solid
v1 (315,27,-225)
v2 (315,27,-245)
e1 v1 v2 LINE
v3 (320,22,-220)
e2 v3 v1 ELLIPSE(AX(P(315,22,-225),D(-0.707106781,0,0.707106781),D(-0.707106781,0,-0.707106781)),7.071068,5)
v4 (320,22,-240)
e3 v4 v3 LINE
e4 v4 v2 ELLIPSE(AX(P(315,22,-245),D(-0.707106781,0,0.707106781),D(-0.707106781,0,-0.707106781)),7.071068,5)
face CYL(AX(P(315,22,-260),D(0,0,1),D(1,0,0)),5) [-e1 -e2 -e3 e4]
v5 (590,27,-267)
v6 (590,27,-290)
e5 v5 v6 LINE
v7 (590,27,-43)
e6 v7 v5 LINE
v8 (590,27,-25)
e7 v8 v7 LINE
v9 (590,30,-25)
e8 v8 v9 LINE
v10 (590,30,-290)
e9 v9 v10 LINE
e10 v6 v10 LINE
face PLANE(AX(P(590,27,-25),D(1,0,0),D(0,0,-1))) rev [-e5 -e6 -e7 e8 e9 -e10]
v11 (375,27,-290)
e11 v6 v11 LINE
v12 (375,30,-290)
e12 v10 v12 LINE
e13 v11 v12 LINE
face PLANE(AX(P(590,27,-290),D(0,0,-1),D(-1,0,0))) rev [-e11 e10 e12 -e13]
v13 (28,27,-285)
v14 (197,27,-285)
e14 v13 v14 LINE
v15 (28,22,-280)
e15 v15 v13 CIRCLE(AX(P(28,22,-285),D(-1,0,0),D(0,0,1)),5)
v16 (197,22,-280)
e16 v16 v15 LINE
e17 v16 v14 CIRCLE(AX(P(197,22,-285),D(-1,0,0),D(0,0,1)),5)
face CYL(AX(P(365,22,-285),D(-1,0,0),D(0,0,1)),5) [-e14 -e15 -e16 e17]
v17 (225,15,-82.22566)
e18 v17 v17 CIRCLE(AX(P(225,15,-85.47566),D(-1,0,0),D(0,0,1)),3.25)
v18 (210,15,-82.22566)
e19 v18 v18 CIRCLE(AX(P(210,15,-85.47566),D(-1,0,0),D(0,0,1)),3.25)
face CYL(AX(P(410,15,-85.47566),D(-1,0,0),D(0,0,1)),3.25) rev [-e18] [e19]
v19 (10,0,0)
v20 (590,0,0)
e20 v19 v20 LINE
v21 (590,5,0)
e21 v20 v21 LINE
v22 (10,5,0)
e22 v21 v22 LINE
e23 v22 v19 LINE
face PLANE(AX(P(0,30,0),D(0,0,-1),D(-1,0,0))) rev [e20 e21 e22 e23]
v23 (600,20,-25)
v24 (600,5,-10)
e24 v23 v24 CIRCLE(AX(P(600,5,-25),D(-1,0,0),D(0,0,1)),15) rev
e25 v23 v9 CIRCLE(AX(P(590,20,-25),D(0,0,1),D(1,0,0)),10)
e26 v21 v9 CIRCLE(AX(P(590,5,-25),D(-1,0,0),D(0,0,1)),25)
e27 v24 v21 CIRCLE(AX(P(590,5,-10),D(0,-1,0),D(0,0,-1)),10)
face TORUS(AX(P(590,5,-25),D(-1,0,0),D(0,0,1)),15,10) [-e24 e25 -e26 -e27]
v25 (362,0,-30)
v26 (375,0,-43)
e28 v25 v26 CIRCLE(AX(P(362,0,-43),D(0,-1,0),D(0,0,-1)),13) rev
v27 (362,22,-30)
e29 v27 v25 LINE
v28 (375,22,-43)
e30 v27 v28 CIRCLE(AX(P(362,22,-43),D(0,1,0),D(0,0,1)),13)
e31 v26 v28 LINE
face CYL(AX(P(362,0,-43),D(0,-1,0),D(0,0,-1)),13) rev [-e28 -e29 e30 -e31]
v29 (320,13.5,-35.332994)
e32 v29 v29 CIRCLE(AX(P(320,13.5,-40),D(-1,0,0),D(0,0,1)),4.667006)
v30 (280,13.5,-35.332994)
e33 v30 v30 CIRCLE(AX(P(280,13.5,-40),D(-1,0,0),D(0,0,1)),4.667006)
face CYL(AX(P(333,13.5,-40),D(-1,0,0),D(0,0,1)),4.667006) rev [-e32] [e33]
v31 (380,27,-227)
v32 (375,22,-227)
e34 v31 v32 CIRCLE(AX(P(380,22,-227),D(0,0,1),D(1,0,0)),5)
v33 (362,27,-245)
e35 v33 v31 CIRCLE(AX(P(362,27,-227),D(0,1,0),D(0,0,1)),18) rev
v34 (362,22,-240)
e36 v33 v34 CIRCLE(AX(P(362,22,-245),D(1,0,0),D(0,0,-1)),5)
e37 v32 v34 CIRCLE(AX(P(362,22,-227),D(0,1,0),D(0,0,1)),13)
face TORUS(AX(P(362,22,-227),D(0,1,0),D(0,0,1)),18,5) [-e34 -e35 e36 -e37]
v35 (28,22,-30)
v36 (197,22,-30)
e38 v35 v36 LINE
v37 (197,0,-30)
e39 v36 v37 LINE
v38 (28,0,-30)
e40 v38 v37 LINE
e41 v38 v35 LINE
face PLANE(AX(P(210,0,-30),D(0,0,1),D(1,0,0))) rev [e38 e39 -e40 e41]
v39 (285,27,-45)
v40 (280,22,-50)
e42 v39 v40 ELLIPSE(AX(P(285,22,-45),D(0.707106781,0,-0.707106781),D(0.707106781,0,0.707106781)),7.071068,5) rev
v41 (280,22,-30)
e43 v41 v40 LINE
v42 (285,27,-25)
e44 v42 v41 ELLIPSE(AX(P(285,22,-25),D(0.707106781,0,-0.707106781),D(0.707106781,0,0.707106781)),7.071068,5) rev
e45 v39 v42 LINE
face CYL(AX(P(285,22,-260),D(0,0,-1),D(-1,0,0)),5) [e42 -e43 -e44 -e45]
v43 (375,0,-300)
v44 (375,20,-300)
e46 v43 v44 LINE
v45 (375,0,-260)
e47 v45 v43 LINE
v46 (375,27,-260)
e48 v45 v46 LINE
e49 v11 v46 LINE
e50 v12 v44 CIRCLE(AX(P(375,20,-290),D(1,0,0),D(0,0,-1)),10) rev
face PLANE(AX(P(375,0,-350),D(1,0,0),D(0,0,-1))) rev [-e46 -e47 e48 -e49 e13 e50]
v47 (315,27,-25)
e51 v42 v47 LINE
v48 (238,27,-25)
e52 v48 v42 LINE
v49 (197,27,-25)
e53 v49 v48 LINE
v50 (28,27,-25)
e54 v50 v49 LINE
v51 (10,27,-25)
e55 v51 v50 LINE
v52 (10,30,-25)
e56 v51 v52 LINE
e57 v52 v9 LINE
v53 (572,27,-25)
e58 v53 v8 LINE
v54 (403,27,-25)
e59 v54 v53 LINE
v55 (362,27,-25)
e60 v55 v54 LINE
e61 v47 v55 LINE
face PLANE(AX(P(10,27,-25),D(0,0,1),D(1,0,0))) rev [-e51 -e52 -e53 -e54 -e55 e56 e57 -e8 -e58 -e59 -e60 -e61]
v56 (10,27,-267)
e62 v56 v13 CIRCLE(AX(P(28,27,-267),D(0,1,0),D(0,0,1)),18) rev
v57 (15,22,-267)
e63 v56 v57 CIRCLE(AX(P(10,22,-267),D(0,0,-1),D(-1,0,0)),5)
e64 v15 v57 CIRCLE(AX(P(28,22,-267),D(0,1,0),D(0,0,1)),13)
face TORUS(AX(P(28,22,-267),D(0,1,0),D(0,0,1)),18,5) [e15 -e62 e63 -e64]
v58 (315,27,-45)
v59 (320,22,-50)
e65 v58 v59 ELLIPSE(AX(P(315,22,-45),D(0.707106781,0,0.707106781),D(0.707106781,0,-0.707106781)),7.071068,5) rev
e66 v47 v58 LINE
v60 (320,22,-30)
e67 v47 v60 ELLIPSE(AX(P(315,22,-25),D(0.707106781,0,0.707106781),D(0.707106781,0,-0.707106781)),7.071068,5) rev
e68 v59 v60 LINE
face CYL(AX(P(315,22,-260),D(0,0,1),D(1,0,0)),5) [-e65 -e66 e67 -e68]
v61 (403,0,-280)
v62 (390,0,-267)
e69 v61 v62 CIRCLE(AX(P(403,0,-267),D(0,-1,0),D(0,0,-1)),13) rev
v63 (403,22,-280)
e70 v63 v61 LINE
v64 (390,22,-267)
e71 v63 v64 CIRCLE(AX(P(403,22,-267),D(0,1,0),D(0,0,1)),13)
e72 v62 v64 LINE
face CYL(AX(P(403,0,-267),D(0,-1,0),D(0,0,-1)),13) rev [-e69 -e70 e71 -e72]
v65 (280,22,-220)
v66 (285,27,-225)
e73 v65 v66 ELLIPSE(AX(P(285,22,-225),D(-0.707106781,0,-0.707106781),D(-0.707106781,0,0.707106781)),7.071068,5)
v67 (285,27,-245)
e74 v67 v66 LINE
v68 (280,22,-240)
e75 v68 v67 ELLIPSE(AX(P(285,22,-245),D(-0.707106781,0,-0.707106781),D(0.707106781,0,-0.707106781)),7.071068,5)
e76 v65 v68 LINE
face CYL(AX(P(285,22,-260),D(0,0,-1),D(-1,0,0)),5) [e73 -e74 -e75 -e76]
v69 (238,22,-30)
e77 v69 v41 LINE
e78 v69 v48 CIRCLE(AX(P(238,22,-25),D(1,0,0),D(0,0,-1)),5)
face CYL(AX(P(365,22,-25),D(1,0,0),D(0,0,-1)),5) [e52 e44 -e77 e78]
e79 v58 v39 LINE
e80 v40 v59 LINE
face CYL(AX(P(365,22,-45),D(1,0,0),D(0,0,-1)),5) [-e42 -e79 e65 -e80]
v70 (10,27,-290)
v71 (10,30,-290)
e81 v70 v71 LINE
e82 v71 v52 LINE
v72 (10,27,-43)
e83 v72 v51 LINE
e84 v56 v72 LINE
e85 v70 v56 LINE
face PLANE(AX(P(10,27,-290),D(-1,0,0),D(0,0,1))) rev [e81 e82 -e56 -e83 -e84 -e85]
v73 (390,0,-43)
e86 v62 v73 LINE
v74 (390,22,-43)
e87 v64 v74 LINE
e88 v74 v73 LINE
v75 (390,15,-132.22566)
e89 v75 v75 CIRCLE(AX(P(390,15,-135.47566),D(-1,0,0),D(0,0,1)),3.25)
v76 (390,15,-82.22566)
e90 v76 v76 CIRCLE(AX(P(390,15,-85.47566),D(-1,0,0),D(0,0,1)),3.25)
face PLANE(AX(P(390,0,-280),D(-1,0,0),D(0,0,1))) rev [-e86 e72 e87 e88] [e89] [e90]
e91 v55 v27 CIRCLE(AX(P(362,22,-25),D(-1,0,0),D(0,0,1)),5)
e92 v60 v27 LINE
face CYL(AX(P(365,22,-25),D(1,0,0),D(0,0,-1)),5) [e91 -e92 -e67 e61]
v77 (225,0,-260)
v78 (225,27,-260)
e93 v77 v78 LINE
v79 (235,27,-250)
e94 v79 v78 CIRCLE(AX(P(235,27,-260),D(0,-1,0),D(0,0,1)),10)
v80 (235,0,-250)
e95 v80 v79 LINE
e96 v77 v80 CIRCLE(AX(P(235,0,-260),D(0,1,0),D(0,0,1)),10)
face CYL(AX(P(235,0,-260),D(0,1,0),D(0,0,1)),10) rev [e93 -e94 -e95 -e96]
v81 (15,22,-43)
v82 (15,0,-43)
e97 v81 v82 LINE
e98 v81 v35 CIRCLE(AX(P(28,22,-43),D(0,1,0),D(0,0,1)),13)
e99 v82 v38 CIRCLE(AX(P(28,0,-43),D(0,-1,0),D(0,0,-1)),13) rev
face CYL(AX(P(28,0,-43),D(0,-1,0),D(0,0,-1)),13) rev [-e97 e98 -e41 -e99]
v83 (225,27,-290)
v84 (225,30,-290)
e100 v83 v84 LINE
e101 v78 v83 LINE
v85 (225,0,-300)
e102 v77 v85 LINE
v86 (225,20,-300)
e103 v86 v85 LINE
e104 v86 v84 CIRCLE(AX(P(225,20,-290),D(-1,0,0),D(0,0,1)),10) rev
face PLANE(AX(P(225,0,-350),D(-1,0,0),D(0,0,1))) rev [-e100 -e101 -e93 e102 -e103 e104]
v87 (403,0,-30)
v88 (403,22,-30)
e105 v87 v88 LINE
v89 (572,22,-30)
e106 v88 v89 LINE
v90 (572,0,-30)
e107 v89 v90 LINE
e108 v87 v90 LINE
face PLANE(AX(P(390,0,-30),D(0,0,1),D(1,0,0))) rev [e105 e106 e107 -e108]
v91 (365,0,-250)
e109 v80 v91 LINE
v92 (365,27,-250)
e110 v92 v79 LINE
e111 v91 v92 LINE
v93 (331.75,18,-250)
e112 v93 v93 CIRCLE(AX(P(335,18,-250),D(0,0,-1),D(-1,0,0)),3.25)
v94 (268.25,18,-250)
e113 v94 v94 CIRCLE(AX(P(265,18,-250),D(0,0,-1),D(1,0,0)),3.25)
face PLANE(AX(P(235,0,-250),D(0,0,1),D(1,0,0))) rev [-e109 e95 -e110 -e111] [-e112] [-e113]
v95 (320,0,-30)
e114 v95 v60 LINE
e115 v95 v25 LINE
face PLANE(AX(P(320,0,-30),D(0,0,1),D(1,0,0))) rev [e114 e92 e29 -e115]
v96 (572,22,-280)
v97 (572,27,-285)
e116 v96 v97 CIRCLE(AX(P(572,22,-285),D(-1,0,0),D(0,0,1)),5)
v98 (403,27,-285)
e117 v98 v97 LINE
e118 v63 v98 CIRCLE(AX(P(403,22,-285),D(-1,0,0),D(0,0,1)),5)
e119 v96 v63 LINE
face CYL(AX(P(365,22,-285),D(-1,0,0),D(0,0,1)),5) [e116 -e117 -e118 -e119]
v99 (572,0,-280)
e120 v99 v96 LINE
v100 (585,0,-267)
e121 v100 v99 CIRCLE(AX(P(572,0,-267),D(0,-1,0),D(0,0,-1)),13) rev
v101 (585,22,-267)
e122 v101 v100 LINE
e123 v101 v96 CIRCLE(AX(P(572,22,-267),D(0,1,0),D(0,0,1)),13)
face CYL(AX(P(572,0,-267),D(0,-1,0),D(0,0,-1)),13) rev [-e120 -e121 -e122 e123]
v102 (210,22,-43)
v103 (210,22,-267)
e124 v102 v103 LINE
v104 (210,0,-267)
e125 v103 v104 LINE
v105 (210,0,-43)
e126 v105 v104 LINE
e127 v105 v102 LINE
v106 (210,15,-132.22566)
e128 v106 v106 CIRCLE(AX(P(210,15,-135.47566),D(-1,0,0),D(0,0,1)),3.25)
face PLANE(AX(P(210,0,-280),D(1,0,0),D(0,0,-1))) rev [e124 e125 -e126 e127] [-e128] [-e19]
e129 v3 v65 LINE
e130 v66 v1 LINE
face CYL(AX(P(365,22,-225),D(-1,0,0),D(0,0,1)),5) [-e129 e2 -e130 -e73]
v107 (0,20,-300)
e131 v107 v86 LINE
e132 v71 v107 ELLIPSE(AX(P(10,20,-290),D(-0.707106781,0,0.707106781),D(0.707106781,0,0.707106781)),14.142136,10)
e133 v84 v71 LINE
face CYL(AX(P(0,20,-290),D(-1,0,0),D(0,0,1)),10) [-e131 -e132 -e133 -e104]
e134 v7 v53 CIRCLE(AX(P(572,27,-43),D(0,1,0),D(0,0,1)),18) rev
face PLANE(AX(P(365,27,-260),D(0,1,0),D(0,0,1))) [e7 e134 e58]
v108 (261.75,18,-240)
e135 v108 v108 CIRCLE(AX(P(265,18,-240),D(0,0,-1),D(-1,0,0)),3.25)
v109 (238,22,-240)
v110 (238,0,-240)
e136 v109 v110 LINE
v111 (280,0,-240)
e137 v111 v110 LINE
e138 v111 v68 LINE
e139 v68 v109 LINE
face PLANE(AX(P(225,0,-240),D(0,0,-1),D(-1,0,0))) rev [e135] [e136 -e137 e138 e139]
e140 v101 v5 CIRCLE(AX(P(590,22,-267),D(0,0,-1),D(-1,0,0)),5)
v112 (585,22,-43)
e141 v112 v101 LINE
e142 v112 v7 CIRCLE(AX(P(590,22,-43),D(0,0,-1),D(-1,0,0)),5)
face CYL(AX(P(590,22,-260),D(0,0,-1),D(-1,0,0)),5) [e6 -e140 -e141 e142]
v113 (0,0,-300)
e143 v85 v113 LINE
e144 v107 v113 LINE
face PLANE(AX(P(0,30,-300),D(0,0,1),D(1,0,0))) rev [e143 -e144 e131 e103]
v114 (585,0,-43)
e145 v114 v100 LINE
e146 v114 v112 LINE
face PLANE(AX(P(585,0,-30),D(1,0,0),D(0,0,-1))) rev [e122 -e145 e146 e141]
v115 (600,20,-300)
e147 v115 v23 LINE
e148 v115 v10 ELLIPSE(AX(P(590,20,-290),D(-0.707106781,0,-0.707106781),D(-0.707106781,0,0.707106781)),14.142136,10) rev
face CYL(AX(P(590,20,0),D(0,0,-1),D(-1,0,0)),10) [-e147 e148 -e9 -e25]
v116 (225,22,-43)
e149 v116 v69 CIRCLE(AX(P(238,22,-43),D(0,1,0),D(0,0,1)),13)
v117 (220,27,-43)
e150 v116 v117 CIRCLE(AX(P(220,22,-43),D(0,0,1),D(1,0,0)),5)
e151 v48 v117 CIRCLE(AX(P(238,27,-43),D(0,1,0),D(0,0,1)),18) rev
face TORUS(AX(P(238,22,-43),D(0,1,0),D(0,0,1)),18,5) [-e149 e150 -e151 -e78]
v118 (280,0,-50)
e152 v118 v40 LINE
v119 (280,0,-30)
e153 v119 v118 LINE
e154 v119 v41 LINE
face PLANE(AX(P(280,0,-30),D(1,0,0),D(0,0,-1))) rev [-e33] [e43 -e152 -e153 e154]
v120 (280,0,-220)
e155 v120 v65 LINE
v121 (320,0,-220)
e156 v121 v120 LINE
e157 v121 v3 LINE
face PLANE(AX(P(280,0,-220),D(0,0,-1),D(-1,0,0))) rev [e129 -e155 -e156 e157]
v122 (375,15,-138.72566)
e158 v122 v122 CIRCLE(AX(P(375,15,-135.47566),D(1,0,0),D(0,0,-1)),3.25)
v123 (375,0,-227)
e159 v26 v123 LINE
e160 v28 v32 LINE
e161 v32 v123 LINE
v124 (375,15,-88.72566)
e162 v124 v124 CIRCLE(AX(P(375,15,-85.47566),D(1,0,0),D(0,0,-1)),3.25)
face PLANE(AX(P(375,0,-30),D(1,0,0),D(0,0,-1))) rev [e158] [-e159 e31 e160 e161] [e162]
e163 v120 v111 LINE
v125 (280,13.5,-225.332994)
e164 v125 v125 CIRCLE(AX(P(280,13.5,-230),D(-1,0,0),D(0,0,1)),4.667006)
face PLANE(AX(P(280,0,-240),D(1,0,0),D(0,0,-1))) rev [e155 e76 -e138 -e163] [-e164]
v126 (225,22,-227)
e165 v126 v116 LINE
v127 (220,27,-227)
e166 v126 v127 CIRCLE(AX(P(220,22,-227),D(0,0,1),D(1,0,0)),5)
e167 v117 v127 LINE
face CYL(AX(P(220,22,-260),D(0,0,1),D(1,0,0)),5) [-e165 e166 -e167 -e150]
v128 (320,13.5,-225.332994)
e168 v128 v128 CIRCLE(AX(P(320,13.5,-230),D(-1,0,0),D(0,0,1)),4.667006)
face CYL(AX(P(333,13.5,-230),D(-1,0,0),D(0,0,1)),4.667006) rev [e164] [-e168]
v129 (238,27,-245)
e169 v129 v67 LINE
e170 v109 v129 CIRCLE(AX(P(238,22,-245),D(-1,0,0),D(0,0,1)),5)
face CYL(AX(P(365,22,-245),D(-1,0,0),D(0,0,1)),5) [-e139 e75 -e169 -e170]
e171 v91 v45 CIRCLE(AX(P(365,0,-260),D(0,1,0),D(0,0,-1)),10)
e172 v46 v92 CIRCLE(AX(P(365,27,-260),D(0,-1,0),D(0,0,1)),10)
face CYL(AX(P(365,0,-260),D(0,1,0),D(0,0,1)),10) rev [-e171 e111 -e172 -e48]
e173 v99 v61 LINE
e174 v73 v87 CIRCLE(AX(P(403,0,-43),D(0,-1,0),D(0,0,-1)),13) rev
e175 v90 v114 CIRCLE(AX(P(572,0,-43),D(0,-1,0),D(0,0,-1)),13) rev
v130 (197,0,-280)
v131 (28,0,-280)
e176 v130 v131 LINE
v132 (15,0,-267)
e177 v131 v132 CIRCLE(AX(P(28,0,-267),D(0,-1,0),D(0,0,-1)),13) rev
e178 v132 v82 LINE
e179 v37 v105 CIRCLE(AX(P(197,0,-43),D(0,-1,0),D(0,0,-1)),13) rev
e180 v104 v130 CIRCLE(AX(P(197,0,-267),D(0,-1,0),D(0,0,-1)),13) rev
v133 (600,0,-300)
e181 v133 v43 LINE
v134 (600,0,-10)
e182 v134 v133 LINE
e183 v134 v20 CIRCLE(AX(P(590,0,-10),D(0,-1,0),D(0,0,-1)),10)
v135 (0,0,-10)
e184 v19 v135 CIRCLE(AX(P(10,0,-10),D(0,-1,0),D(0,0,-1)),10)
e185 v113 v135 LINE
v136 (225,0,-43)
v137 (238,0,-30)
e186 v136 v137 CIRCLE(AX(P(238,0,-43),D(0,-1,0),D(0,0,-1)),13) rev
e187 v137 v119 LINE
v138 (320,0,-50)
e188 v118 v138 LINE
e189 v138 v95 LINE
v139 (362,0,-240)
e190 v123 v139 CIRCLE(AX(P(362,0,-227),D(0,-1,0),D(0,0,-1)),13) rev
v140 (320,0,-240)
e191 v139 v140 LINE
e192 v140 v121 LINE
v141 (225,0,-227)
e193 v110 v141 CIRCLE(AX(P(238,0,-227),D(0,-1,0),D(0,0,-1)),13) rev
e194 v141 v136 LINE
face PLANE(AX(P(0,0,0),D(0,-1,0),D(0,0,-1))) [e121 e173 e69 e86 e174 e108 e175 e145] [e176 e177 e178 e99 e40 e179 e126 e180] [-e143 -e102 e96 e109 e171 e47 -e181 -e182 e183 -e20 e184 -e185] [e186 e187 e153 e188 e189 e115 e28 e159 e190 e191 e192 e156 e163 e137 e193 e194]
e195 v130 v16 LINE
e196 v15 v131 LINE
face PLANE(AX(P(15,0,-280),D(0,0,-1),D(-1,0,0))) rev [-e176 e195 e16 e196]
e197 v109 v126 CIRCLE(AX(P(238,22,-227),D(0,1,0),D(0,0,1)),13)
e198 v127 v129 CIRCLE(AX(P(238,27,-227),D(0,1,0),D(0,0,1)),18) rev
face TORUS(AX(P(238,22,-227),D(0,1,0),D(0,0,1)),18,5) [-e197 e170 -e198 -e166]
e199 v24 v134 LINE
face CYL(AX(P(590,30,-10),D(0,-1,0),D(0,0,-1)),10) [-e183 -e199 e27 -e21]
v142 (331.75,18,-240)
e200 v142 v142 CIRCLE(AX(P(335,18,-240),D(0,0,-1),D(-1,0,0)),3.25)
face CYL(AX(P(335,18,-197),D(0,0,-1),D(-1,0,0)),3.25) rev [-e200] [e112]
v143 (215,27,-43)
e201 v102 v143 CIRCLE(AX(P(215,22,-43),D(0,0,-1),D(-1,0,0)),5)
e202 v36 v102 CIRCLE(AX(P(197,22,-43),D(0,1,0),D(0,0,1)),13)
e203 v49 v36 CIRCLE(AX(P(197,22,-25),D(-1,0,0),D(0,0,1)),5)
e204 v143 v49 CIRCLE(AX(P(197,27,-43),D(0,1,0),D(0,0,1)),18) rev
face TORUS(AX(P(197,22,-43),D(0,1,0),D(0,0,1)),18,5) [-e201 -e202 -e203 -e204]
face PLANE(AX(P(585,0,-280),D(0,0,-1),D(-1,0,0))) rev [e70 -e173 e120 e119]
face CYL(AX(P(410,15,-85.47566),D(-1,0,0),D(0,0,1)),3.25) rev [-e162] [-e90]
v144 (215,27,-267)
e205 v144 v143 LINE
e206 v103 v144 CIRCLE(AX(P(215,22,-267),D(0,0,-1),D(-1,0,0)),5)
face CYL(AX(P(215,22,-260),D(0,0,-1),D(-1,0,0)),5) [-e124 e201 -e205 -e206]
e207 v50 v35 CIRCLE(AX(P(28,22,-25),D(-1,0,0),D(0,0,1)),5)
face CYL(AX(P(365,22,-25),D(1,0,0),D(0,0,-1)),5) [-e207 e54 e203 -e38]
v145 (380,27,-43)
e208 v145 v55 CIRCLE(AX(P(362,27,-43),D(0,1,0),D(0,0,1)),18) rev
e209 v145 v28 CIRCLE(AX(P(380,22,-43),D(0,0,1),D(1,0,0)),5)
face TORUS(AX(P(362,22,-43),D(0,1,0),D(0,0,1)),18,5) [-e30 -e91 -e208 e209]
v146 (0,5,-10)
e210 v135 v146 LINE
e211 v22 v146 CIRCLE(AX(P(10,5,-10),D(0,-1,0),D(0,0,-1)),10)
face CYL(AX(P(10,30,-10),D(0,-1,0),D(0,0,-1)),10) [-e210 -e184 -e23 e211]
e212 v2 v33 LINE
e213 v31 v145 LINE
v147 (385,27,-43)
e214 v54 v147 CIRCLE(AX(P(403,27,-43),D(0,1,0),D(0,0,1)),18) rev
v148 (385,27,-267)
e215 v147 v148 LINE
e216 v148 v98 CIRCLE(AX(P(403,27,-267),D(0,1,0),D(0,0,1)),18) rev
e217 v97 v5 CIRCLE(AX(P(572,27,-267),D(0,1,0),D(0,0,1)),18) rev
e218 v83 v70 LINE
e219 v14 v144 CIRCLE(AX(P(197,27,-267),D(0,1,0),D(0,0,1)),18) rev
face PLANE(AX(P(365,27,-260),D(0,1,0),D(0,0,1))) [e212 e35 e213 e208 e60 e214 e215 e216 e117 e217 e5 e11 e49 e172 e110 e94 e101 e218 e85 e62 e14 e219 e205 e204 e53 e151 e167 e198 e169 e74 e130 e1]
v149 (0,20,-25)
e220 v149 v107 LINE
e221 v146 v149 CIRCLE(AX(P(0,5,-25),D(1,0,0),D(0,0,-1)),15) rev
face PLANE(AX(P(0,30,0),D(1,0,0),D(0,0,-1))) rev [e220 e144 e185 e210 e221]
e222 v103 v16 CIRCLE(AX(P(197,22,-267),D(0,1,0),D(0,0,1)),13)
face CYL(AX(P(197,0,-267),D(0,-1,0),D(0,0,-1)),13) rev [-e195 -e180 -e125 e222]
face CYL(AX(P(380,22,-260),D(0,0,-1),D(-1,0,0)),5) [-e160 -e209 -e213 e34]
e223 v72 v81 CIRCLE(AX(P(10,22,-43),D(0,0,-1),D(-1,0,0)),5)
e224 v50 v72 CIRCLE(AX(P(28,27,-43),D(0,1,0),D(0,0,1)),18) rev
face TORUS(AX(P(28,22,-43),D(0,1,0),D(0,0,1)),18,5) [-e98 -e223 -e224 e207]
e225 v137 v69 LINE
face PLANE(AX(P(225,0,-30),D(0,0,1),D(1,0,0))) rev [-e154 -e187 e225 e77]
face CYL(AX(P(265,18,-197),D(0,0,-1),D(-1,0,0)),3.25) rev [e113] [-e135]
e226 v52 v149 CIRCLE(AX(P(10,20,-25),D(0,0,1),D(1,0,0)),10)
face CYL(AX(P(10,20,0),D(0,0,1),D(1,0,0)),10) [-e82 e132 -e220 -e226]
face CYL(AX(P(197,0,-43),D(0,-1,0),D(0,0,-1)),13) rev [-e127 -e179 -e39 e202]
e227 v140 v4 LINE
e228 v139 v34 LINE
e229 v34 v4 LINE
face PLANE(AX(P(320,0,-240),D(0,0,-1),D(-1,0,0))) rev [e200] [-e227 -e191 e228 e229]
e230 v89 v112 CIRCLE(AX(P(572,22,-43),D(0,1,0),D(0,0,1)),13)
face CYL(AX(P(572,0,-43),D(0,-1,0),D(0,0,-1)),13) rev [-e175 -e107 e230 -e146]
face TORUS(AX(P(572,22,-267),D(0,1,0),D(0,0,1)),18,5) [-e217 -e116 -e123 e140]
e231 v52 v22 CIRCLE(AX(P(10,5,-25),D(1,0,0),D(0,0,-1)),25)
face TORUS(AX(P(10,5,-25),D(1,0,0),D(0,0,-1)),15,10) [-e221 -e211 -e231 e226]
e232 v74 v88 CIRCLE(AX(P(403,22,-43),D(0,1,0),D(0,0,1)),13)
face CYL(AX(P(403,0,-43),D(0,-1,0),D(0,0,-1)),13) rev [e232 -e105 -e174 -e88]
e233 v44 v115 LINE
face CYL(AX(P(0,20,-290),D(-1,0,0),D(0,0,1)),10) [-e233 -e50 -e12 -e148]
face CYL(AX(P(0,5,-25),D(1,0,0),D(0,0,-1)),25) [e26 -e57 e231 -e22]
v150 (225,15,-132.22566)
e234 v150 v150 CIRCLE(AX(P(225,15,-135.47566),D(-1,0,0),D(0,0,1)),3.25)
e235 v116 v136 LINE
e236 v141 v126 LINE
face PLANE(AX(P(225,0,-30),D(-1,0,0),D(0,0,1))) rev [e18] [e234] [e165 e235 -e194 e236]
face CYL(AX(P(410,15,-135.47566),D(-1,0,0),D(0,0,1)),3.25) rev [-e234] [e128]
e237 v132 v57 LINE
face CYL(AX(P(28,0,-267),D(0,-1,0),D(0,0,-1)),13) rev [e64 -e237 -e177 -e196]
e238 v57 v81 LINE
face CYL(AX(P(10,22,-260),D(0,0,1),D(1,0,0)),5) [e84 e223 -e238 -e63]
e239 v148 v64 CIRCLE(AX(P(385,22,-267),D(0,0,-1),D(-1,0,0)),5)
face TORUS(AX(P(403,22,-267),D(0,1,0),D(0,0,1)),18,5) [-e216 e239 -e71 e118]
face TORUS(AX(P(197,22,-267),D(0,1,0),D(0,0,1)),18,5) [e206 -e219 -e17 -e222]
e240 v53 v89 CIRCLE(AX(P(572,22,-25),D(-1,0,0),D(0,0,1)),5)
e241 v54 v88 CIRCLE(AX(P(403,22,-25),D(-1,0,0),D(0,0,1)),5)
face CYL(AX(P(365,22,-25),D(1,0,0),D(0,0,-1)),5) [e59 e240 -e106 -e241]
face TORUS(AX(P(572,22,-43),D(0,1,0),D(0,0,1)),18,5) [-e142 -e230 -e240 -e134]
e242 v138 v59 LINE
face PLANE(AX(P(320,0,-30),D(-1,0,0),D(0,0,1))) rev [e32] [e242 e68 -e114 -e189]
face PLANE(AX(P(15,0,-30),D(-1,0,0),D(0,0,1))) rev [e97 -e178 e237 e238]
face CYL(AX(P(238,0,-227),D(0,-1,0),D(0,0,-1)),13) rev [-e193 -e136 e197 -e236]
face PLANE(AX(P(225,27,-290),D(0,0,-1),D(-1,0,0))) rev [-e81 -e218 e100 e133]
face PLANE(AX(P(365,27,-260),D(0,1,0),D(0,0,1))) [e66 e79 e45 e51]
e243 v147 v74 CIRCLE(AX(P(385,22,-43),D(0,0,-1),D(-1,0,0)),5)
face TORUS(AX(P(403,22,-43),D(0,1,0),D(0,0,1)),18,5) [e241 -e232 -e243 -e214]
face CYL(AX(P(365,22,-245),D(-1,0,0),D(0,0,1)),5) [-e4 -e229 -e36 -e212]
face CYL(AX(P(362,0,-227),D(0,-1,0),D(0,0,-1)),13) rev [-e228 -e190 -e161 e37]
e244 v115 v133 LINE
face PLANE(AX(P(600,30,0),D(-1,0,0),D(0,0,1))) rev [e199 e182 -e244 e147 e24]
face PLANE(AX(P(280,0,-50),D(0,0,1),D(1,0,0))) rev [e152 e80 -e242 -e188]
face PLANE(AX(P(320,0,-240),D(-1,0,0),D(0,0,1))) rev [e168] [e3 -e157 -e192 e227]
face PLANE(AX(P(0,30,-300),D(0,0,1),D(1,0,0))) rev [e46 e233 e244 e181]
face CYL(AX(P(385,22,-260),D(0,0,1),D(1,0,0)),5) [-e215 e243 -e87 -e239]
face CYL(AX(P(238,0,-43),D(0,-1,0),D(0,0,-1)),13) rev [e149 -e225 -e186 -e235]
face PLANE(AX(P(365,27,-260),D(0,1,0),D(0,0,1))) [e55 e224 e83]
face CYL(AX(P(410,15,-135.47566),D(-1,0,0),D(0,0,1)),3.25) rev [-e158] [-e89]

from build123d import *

# Parameters (mm, degrees)
SKETCH1_W           = 600
SKETCH1_H           = 300
BOSS_EXTRUDE1_DEPTH = 30
CUT_EXTRUDE1_DEPTH  = 672.490878568
FILLET1_R           = 25
FILLET2_R           = 10
SKETCH3_W           = 195
SKETCH3_H           = 250
CUT_EXTRUDE2_DEPTH  = 672.490878568
SKETCH4_R           = 3.25
CUT_EXTRUDE3_DEPTH  = 200
CUT_EXTRUDE4_DEPTH  = 3
SKETCH7_R           = 4.66700581
CUT_EXTRUDE5_DEPTH  = 53
SKETCH8_R           = 3.25
CUT_EXTRUDE6_DEPTH  = 53
FILLET3_R           = 13
FILLET4_R           = 5


with BuildPart() as part:
    # Sketch1 → Boss-Extrude1 (new body)
    with BuildSketch(Plane(origin=(0, 0, 0), x_dir=(1, 0, 0), z_dir=(0, 1, 0))):
        with Locations((300, 150)):
            Rectangle(SKETCH1_W, SKETCH1_H)
    extrude(amount=BOSS_EXTRUDE1_DEPTH)

    # Sketch2 → Cut-Extrude1 (cut, through all)
    with BuildSketch(Plane(origin=(0, 30, 0), x_dir=(1, 0, 0), z_dir=(0, 1, 0))):
        with BuildLine():
            Line((225, 350), (375, 350))
            Line((375, 350), (375, 260))
            ThreePointArc((375, 260), (372.071067812, 252.928932188), (365, 250))
            Line((365, 250), (235, 250))
            ThreePointArc((235, 250), (227.928932188, 252.928932188), (225, 260))
            Line((225, 260), (225, 350))
        make_face()
    extrude(amount=-CUT_EXTRUDE1_DEPTH, mode=Mode.SUBTRACT)

    # Fillet1
    fillet1_edges = [part.edges().sort_by_distance(p)[0] for p in [
        (300, 30, 0),
    ]]
    fillet(fillet1_edges, radius=FILLET1_R)

    # Fillet2
    fillet2_edges = [part.edges().sort_by_distance(p)[0] for p in [
        (487.5, 30, -300),
        (112.5, 30, -300),
        (600, 30, -162.5),
        (600, 2.5, 0),
        (600, 22.67766953, -7.32233047),
        (0, 2.5, 0),
        (0, 22.67766953, -7.32233047),
        (0, 30, -162.5),
    ]]
    fillet(fillet2_edges, radius=FILLET2_R)

    # Sketch3 → Cut-Extrude2 (cut, through all)
    with BuildSketch(Plane(origin=(0, 30, 0), x_dir=(1, 0, 0), z_dir=(0, 1, 0))):
        Polygon((280, 240), (280, 220), (320, 220), (320, 240), (375, 240), (375, 30), (320, 30), (320, 50), (280, 50), (280, 30), (225, 30), (225, 240), align=None)
        with Locations((112.5, 155)):
            Rectangle(SKETCH3_W, SKETCH3_H)
        with Locations((487.5, 155)):
            Rectangle(SKETCH3_W, SKETCH3_H)
    extrude(amount=-CUT_EXTRUDE2_DEPTH, mode=Mode.SUBTRACT)

    # Sketch4 → Cut-Extrude3 (cut)
    with BuildSketch(Plane.ZY.offset(-210)):
        with Locations((-135.475660035, 15)):
            Circle(SKETCH4_R)
        with Locations((-85.475660035, 15)):
            Circle(SKETCH4_R)
    extrude(amount=-CUT_EXTRUDE3_DEPTH, mode=Mode.SUBTRACT)

    # Sketch6 → Cut-Extrude4 (cut)
    with BuildSketch(Plane(origin=(0, 30, 0), x_dir=(1, 0, 0), z_dir=(0, 1, 0))):
        with BuildLine():
            Line((10, 25), (590, 25))
            Line((590, 25), (590, 290))
            Line((590, 290), (375, 290))
            Line((375, 290), (375, 260))
            ThreePointArc((375, 260), (372.071067812, 252.928932188), (365, 250))
            Line((365, 250), (235, 250))
            ThreePointArc((235, 250), (227.928932188, 252.928932188), (225, 260))
            Line((225, 260), (225, 290))
            Line((225, 290), (10, 290))
            Line((10, 290), (10, 25))
        make_face()
    extrude(amount=-CUT_EXTRUDE4_DEPTH, mode=Mode.SUBTRACT)

    # Sketch7 → Cut-Extrude5 (cut)
    with BuildSketch(Plane.ZY.offset(-280)):
        with Locations((-230, 13.5)):
            Circle(SKETCH7_R)
        with Locations((-40, 13.5)):
            Circle(SKETCH7_R)
    extrude(amount=-CUT_EXTRUDE5_DEPTH, mode=Mode.SUBTRACT)

    # Sketch8 → Cut-Extrude6 (cut)
    with BuildSketch(Plane(origin=(0, 0, -250), x_dir=(-1, 0, 0), z_dir=(0, 0, -1))):
        with Locations((-335, 18)):
            Circle(SKETCH8_R)
        with Locations((-265, 18)):
            Circle(SKETCH8_R)
    extrude(amount=-CUT_EXTRUDE6_DEPTH, mode=Mode.SUBTRACT)

    # Fillet3
    fillet3_edges = [part.edges().sort_by_distance(p)[0] for p in [
        (390, 13.5, -30),
        (390, 13.5, -280),
        (585, 13.5, -280),
        (585, 13.5, -30),
        (15, 13.5, -30),
        (15, 13.5, -280),
        (210, 13.5, -280),
        (210, 13.5, -30),
        (225, 13.5, -240),
        (375, 13.5, -240),
        (375, 13.5, -30),
        (225, 13.5, -30),
    ]]
    fillet(fillet3_edges, radius=FILLET3_R)

    # Fillet4
    fillet4_edges = [part.edges().sort_by_distance(p)[0] for p in [
        (280, 27, -230),
        (300, 27, -220),
        (320, 27, -230),
        (341, 27, -240),
        (320, 27, -40),
        (300, 27, -50),
        (280, 27, -40),
        (259, 27, -30),
        (375, 27, -135),
        (390, 27, -155),
        (487.5, 27, -280),
        (585, 27, -155),
        (487.5, 27, -30),
        (341, 27, -30),
        (225, 27, -135),
        (259, 27, -240),
        (210, 27, -155),
        (112.5, 27, -30),
        (15, 27, -155),
        (112.5, 27, -280),
        (371.192388155, 27, -236.192388155),
        (393.807611845, 27, -276.192388155),
        (581.192388155, 27, -276.192388155),
        (581.192388155, 27, -33.807611845),
        (393.807611845, 27, -33.807611845),
        (371.192388155, 27, -33.807611845),
        (228.807611845, 27, -236.192388155),
        (228.807611845, 27, -33.807611845),
        (206.192388155, 27, -33.807611845),
        (18.807611845, 27, -33.807611845),
        (18.807611845, 27, -276.192388155),
        (206.192388155, 27, -276.192388155),
    ]]
    fillet(fillet4_edges, radius=FILLET4_R - 0.0001)  # a hair under: the kernel refuses the full size


solid = part.part
